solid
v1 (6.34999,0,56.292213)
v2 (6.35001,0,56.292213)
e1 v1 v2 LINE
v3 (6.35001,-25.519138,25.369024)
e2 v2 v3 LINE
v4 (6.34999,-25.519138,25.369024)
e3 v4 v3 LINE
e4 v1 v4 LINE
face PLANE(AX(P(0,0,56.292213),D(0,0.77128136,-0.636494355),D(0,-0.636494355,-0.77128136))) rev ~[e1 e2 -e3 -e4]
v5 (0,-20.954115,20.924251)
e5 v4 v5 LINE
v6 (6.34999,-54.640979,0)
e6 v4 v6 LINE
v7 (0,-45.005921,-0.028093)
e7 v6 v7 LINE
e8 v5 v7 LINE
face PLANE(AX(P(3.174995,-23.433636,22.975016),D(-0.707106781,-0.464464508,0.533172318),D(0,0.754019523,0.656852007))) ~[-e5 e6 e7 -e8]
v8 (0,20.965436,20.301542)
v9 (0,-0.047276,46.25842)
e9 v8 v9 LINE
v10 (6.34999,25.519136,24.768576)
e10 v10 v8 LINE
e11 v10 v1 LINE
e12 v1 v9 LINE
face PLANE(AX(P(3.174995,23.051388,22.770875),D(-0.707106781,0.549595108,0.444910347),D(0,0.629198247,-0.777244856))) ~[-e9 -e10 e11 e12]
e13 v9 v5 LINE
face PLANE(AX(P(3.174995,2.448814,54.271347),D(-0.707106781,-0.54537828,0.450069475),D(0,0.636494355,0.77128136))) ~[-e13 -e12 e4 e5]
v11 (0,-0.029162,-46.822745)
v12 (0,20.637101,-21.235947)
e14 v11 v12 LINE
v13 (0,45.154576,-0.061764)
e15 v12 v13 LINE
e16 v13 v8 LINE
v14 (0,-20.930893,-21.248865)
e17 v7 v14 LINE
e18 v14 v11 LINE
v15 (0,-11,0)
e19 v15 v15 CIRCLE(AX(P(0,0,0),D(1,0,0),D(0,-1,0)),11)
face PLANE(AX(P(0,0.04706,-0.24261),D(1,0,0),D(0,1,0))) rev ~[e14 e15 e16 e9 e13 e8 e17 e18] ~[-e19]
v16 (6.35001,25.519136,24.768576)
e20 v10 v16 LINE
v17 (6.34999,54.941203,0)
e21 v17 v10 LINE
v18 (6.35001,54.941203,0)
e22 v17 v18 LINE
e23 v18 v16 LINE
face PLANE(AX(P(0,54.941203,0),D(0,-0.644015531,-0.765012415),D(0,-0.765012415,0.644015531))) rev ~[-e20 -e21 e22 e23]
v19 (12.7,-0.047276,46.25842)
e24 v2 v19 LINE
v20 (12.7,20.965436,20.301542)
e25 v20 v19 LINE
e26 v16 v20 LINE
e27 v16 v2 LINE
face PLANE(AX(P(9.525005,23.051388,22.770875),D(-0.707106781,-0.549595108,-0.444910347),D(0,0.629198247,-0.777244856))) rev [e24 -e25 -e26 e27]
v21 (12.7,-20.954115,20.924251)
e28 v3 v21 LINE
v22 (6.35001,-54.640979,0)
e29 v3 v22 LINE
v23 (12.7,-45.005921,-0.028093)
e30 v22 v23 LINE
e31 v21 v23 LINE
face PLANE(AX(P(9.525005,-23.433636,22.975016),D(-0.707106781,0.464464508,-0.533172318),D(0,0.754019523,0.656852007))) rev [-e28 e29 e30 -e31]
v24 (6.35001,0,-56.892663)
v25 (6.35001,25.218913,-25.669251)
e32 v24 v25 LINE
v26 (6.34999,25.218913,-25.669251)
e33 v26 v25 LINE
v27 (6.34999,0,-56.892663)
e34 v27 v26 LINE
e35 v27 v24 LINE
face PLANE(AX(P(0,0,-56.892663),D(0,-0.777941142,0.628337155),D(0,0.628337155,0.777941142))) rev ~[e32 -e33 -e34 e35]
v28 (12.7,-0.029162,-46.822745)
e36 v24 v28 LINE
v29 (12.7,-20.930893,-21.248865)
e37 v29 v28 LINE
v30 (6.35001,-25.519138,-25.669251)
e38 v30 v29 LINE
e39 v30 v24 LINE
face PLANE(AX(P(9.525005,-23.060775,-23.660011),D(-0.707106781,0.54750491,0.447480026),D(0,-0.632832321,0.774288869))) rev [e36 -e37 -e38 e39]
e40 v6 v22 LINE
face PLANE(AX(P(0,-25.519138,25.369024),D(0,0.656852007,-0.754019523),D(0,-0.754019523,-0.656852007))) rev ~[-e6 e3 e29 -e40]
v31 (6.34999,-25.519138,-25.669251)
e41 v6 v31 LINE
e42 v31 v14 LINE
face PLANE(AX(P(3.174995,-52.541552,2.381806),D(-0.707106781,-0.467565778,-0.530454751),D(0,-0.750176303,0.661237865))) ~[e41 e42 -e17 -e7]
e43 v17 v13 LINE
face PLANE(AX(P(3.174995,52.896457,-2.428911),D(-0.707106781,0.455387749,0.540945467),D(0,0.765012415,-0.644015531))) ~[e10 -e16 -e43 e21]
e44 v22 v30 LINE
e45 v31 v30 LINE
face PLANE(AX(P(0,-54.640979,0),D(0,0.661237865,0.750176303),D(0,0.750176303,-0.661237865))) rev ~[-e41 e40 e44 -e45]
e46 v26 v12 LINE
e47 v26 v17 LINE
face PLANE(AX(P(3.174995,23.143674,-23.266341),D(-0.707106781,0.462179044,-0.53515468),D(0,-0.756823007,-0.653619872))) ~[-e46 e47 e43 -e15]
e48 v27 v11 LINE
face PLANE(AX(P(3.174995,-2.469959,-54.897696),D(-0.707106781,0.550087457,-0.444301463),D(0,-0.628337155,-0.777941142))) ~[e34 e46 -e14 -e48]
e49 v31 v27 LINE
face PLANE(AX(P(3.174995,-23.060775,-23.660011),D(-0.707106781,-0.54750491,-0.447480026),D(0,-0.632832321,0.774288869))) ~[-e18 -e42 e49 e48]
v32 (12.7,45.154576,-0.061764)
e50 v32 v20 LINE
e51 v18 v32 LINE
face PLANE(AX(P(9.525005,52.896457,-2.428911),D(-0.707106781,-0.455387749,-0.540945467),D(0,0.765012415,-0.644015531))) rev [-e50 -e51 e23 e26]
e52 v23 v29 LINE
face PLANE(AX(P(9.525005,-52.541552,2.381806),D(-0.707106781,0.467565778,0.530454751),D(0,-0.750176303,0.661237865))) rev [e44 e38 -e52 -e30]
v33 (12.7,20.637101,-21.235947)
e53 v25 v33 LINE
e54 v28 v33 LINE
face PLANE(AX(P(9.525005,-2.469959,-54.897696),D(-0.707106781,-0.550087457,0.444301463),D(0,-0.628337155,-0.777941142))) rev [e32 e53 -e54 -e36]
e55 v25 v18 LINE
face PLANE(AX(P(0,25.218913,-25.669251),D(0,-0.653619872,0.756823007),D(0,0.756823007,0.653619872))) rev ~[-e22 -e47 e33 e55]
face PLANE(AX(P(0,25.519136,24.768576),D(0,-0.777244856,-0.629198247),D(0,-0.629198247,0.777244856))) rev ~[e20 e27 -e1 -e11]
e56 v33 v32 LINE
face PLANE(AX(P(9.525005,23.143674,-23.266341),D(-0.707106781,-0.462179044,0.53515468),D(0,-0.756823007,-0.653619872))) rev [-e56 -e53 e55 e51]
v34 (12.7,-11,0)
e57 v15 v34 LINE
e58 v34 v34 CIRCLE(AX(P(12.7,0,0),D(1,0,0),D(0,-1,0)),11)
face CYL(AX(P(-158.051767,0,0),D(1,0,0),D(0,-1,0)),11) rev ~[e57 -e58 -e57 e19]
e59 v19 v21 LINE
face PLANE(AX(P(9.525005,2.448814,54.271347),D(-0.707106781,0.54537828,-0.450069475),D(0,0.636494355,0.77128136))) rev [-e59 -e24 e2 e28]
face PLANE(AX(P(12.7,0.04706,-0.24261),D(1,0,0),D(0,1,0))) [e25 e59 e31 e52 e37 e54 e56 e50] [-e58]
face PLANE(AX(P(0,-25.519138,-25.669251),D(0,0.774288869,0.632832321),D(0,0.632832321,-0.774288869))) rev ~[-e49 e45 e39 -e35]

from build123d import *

# Parameters (mm, degrees)
F1_DEPTH = 12.7
F2_SIZE  = 6.34999
F4_D     = 22


# Not quite as in the source:
# - a fillet or chamfer is up to 0.001 mm smaller than in the source, because OpenCascade refuses the exact size


with BuildPart() as f1:
    # F0 (on Right) → F1 (new body)
    with BuildSketch(Plane.YZ):
        Polygon((0, 56.2922134995), (-25.5191382021, 25.3690239042), (-54.6409785748, 0), (-25.5191382021, -25.6692506373), (0, -56.8926632404), (25.2189133316, -25.6692506373), (54.9412034452, 0), (25.5191363394, 24.768576026), align=None)
    extrude(amount=F1_DEPTH)

    # F2 (size 6.35 in the source; OpenCascade refuses exactly that, so slightly less here)
    f2_edges = [f1.edges().sort_by_distance(p)[0] for p in [
        (12.7, -40.080058, 12.684512),
        (0, -40.080058, 12.684512),
        (12.7, -40.080058, -12.834625),
        (0, -40.080058, -12.834625),
        (12.7, -12.759569, -41.280957),
        (0, -12.759569, -41.280957),
        (0, 12.609457, -41.280957),
        (12.7, 12.609457, -41.280957),
        (0, 40.080058, -12.834625),
        (12.7, 40.080058, -12.834625),
        (12.7, 40.23017, 12.384288),
        (0, 40.23017, 12.384288),
        (0, 12.759568, 40.530395),
        (12.7, 12.759568, 40.530395),
        (0, -12.759569, 40.830619),
        (12.7, -12.759569, 40.830619),
    ]]
    chamfer(f2_edges, length=F2_SIZE)

    # F4 (through all)
    with Locations(Plane(origin=(0, 0, 0), x_dir=(0, 1, 0), z_dir=(-1, 0, 0))):
        with Locations((0, 0)):
            Hole(F4_D / 2)


solid = f1.part
